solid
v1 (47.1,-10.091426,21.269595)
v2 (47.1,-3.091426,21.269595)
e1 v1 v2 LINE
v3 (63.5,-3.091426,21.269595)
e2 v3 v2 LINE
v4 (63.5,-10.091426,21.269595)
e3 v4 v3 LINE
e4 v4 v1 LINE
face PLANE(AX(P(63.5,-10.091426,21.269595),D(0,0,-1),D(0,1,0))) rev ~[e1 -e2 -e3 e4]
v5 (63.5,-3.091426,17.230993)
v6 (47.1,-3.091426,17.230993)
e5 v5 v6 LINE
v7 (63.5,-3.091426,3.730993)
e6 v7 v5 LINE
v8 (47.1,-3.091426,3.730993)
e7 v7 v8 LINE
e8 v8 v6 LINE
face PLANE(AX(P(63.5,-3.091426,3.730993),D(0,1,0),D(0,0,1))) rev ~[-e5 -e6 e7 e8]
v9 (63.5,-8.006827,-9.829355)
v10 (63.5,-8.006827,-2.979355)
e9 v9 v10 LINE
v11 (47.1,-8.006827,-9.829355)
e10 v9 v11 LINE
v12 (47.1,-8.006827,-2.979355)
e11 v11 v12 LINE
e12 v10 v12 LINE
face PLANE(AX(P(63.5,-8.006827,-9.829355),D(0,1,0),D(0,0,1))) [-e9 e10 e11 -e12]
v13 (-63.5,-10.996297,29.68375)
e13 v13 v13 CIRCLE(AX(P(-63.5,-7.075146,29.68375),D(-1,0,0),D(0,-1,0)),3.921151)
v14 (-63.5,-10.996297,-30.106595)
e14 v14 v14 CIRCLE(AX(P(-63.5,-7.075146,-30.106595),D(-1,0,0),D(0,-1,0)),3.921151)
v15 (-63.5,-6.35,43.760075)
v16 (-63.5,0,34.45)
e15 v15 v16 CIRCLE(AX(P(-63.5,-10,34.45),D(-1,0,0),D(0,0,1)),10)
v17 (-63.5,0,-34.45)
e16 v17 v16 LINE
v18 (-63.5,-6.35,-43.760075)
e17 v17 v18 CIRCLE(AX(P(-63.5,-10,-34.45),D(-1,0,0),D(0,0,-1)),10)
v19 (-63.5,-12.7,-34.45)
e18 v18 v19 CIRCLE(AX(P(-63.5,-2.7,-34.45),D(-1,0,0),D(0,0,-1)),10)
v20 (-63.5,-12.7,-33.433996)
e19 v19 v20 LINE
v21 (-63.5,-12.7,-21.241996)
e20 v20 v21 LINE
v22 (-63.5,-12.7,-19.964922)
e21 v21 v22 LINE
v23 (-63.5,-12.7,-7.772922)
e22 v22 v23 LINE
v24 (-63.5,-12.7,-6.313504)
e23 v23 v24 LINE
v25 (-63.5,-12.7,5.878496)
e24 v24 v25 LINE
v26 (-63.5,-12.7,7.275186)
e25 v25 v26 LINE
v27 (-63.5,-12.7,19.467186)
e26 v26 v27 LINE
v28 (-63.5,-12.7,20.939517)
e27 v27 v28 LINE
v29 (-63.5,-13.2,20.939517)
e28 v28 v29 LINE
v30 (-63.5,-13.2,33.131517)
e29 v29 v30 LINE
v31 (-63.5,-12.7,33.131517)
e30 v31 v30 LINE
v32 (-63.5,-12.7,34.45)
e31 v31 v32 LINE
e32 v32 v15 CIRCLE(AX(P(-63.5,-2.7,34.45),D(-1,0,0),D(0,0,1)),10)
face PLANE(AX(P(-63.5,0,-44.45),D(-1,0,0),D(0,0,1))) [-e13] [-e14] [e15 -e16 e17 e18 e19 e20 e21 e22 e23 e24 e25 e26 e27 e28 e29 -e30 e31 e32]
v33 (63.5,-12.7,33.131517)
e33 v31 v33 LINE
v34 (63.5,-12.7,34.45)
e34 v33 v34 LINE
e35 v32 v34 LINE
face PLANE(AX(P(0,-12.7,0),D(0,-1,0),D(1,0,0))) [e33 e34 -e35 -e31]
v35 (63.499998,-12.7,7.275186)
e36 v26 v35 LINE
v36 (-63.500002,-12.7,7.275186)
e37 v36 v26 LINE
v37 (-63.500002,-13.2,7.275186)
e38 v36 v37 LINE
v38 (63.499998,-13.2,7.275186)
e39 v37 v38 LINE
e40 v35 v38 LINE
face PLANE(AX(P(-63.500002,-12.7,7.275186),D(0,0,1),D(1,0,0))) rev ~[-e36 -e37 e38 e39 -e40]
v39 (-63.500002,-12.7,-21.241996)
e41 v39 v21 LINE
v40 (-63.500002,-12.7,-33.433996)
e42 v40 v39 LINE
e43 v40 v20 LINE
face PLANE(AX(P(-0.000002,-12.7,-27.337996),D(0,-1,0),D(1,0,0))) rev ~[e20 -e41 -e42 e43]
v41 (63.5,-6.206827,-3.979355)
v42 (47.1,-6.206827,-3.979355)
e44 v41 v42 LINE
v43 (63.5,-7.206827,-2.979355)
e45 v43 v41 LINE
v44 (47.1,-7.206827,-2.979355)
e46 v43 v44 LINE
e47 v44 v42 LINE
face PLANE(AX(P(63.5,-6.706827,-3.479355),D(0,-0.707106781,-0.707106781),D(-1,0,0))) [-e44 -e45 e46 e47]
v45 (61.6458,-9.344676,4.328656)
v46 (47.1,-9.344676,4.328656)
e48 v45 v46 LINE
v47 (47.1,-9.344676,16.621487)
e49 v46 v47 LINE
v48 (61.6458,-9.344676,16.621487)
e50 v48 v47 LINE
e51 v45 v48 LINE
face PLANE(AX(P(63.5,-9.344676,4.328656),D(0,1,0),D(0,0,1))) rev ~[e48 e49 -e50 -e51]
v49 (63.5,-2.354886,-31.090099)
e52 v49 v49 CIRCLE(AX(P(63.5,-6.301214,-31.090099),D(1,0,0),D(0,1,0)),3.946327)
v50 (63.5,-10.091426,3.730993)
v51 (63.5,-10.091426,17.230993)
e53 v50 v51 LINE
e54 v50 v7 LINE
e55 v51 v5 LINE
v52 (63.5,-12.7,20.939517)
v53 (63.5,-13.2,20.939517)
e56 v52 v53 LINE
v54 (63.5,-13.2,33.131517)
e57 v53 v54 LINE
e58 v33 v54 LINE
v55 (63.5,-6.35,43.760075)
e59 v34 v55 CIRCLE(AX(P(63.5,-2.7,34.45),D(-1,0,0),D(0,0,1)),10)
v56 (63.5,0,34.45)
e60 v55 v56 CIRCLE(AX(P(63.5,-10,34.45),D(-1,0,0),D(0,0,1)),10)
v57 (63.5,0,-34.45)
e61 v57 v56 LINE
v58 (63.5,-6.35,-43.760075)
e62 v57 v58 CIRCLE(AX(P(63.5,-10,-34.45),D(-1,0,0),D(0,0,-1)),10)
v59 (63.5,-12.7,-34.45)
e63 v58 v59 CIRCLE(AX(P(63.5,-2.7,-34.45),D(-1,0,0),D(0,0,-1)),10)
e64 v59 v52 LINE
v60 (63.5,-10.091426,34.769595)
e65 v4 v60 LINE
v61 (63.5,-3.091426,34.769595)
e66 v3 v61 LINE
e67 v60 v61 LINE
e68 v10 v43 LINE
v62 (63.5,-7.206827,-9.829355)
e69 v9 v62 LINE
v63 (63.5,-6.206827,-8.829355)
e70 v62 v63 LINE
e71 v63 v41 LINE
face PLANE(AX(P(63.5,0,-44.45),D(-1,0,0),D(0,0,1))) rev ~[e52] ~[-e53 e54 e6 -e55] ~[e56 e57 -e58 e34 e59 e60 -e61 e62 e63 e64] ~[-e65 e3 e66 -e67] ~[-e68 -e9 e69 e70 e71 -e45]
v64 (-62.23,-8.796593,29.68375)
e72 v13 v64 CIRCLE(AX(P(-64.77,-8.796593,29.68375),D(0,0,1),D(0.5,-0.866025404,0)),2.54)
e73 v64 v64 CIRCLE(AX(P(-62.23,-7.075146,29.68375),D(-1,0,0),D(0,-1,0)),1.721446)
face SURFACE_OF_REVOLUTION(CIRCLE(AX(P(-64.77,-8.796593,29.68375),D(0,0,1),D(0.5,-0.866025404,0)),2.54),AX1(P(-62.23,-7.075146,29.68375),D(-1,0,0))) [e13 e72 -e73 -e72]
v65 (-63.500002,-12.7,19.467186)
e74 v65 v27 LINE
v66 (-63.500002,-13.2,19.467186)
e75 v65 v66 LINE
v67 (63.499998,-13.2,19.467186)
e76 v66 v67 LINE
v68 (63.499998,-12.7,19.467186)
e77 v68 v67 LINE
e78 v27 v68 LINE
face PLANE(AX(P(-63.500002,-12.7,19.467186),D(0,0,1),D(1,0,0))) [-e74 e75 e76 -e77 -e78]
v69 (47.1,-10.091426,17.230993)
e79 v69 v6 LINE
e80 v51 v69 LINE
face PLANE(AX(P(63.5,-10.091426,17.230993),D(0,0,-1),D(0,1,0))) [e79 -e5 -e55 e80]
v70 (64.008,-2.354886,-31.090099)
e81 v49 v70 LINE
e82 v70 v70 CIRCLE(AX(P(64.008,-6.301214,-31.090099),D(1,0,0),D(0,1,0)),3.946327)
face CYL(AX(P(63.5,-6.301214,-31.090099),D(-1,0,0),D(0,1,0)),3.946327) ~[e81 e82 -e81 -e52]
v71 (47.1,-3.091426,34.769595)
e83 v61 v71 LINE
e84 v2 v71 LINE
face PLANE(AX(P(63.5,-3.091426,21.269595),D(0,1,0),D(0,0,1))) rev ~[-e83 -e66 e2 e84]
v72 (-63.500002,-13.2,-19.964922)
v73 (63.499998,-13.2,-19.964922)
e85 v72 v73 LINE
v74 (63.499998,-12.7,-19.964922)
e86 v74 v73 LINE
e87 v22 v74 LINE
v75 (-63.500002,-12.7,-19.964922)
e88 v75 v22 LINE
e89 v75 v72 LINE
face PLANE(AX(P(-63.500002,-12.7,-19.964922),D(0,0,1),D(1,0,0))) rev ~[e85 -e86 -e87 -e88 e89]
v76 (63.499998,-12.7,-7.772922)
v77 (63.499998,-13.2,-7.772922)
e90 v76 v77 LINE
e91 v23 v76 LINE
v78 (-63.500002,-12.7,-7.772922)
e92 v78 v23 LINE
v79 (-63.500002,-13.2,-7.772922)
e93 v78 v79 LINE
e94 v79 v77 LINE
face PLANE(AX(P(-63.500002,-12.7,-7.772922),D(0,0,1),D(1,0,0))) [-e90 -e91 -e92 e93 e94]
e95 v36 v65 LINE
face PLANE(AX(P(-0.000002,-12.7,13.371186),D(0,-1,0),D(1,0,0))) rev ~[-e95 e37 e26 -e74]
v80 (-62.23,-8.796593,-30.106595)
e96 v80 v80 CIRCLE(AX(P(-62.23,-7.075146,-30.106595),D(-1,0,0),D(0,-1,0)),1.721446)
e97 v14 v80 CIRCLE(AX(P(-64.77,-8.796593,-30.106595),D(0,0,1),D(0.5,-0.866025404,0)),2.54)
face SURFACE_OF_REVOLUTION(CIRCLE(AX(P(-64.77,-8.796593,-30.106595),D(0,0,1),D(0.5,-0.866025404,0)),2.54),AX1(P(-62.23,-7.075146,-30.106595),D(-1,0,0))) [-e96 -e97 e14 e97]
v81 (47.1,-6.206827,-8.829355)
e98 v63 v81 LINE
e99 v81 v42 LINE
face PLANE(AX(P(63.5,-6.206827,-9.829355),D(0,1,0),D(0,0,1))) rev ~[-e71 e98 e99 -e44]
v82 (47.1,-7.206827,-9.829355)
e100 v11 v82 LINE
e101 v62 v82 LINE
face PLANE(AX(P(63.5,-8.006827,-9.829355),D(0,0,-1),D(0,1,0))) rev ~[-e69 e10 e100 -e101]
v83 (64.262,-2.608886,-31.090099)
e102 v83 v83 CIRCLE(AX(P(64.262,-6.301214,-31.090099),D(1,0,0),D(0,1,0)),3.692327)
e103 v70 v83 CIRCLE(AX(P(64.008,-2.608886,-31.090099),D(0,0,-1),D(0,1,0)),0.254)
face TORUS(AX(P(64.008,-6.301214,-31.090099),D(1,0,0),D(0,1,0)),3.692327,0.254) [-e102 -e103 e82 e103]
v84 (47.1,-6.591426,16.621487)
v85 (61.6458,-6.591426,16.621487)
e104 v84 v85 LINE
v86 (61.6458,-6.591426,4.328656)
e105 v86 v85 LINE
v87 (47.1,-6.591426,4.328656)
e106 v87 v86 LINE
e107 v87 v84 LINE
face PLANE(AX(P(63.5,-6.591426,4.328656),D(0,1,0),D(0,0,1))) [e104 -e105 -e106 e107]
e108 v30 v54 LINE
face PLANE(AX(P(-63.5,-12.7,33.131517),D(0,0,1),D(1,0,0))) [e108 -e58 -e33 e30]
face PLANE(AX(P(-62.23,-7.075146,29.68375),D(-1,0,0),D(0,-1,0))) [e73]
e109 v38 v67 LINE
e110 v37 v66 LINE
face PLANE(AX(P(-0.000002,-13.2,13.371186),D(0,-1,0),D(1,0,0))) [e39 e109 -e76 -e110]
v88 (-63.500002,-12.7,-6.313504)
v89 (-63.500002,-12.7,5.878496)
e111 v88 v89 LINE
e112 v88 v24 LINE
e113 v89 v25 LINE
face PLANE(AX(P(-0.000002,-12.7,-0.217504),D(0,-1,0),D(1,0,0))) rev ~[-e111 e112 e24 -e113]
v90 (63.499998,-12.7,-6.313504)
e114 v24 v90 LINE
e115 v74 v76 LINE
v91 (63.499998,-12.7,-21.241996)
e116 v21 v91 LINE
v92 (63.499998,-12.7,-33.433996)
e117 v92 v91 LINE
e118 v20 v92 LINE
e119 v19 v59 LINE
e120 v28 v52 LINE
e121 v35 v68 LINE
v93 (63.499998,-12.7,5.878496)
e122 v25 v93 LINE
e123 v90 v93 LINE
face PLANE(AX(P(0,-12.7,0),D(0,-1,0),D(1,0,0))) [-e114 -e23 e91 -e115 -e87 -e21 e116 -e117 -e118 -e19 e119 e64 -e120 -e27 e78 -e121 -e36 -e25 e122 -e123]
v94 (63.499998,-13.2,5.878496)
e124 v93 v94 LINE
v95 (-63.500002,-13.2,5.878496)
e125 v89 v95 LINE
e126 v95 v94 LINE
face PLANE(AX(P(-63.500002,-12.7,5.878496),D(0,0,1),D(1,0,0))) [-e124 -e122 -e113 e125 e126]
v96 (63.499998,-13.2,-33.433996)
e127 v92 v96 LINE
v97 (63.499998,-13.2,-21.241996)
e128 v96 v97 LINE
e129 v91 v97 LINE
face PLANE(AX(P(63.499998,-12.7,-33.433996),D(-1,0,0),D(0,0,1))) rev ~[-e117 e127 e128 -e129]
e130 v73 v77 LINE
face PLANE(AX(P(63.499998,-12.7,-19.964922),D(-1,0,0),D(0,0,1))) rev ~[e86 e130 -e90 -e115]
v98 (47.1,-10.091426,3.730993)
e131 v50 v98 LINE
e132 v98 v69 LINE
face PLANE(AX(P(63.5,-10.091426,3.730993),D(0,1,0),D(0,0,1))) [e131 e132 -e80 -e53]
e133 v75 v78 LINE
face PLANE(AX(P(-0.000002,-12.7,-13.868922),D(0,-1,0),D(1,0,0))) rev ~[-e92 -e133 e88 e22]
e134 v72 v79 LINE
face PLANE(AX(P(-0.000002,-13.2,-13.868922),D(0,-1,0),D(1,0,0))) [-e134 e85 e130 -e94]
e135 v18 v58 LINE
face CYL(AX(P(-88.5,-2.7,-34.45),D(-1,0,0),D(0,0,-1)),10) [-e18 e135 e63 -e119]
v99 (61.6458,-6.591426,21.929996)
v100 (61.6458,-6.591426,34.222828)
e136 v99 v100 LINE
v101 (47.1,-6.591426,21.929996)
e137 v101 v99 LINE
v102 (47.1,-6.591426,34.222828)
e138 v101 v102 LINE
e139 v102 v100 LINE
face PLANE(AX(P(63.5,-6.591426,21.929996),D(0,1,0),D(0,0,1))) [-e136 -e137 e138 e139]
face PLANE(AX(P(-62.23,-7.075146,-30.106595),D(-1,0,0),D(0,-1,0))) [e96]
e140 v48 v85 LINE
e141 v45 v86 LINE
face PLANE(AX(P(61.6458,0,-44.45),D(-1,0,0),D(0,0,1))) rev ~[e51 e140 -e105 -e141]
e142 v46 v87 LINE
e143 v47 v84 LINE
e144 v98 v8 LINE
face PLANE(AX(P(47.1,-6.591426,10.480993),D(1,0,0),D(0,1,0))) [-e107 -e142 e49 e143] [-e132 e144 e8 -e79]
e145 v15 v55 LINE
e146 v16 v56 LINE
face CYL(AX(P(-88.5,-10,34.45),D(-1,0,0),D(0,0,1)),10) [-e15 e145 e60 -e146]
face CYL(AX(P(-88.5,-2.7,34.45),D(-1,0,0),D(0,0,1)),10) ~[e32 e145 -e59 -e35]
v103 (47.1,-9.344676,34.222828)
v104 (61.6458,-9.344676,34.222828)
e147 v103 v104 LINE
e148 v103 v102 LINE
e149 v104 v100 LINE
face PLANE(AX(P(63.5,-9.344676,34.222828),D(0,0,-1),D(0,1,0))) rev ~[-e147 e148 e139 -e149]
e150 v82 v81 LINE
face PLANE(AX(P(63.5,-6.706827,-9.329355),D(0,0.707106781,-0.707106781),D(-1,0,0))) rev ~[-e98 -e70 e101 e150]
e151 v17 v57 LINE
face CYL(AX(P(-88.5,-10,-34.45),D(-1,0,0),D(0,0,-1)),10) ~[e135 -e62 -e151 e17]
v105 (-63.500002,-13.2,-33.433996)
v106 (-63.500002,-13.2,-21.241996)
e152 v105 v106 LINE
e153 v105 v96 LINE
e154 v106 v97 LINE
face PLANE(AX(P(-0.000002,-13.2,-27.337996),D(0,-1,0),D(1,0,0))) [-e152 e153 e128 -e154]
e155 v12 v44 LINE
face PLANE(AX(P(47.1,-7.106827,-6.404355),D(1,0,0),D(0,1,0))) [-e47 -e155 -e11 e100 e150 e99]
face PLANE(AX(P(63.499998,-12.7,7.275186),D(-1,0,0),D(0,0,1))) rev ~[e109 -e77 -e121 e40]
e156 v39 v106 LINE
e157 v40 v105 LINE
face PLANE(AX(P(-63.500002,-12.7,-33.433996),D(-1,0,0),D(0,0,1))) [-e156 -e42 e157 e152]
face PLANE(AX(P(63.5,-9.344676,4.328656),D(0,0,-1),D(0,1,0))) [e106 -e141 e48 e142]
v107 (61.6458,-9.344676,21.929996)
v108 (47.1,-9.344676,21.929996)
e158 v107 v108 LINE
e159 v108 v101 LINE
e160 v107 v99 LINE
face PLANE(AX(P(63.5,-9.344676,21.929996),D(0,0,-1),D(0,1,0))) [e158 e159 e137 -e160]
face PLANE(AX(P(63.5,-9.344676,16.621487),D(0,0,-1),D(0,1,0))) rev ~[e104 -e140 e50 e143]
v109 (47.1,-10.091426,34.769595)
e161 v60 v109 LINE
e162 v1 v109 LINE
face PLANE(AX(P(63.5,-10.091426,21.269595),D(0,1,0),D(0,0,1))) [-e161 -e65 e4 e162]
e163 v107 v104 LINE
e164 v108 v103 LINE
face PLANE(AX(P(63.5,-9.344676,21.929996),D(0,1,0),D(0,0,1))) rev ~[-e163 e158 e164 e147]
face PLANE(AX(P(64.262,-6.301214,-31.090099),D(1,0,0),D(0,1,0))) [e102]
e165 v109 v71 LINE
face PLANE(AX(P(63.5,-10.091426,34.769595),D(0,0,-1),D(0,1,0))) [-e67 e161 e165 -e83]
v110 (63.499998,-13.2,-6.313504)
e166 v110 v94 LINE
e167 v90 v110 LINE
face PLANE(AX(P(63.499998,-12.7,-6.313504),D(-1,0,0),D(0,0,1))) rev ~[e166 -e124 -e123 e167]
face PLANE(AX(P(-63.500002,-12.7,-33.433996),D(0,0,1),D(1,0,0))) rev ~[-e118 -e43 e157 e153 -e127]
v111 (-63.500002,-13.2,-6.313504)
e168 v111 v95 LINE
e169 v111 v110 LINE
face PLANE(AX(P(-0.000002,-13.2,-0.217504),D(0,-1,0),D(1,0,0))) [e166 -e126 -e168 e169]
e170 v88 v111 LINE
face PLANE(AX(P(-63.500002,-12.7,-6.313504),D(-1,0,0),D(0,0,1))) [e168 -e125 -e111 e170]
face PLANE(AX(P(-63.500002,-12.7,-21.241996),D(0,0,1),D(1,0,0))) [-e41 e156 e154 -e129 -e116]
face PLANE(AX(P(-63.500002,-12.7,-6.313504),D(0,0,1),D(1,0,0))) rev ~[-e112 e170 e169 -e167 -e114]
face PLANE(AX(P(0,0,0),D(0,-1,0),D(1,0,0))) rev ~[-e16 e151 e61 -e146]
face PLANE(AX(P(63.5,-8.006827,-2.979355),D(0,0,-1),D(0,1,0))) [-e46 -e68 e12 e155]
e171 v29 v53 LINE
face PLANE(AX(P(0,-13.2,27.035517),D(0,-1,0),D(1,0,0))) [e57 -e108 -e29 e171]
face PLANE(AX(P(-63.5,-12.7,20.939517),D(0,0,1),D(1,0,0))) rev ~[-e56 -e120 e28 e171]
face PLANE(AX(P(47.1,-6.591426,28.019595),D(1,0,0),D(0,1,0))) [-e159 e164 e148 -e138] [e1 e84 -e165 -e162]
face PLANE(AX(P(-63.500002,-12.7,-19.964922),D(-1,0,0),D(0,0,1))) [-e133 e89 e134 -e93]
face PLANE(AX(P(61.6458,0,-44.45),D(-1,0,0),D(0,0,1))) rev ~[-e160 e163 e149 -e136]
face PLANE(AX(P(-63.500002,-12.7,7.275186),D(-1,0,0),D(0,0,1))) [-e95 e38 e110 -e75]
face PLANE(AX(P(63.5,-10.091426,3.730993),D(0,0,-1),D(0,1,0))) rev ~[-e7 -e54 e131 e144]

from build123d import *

# Parameters (mm, degrees)
F0_W        = 127
F0_H        = 88.9
F1_DEPTH    = 12.7
F2_T1_DEPTH = 177
F3_W        = 1.8
F3_H        = 6.85
F4_DEPTH    = 16.4
F3_W_2      = 7
F3_H_2      = 13.5
F3_W_3      = 2.7532497272
F3_H_3      = 12.2928316705
F5_DEPTH    = 16.4
F6_SIZE     = 1
F7_DEPTH    = 2.794
F8_DEPTH    = 1.8542
F3_R        = 3.9463270772
F9_DEPTH    = 0.762
F10_R       = 0.254
F13_W       = 127
F13_H       = 12.192
F14_DEPTH   = 0.5
F15_R       = 3.9211509086
F16_DEPTH   = 1.27


# Not quite as in the source:
# - a fillet or chamfer that OpenCascade refuses, or shapes differently, is made with other operations: its cross-section is extruded or revolved along the edge and cut away or added
# - the program builds the solid bodies; features that only make, move or delete a surface that nothing else refers to are left out


with BuildPart() as f1:
    # F0 (on Front) → F1 (new body)
    with BuildSketch(Plane.XZ):
        Rectangle(F0_W, F0_H)
    extrude(amount=F1_DEPTH)

    # F2: fillet of radius 10 on 4 edges, made by hand

    # F2_s2 → F2_t1 (cut)
    with BuildSketch(Plane.YZ.offset(-88.5)):
        with BuildLine():
            ThreePointArc((-2.7, 44.45), (-9.7710678119, 41.5210678119), (-12.7, 34.45))
            Line((-12.7, 34.45), (-12.7, 44.45))
            Line((-12.7, 44.45), (-2.7, 44.45))
        make_face()
        with BuildLine():
            ThreePointArc((-10, 44.45), (-2.9289321881, 41.5210678119), (0, 34.45))
            Line((0, 34.45), (0, 44.45))
            Line((0, 44.45), (-10, 44.45))
        make_face()
        with BuildLine():
            ThreePointArc((-2.7, -44.45), (-9.7710678119, -41.5210678119), (-12.7, -34.45))
            Line((-12.7, -34.45), (-12.7, -44.45))
            Line((-12.7, -44.45), (-2.7, -44.45))
        make_face()
        with BuildLine():
            ThreePointArc((-10, -44.45), (-2.9289321881, -41.5210678119), (0, -34.45))
            Line((0, -34.45), (0, -44.45))
            Line((0, -44.45), (-10, -44.45))
        make_face()
    extrude(amount=F2_T1_DEPTH, mode=Mode.SUBTRACT)

    # F3 (on face) → F4 (cut)
    with BuildSketch(Plane.YZ.offset(63.5)):
        with Locations((-7.1068273082, -6.4043554038)):
            Rectangle(F3_W, F3_H)
    extrude(amount=-F4_DEPTH, mode=Mode.SUBTRACT)

    # F3 (on face) → F5 (cut)
    with BuildSketch(Plane.YZ.offset(63.5)):
        with Locations((-6.591425851, 10.4809925538)):
            Rectangle(F3_W_2, F3_H_2)
        with Locations((-7.9680507146, 10.4750713799)):
            Rectangle(F3_W_3, F3_H_3, mode=Mode.SUBTRACT)
        with Locations((-6.591425851, 28.0195952505)):
            Rectangle(F3_W_2, F3_H_2)
        with Locations((-7.9680507146, 28.0764119234)):
            Rectangle(F3_W_3, F3_H_3, mode=Mode.SUBTRACT)
    extrude(amount=-F5_DEPTH, mode=Mode.SUBTRACT)

    # F6
    f6_edges = [f1.edges().sort_by_distance(p)[0] for p in [
        (55.3, -6.206827, -2.979355),
        (55.3, -6.206827, -9.829355),
    ]]
    chamfer(f6_edges, length=F6_SIZE)

    # F7 (add): faces of the model
    f7_faces = [f1.faces().sort_by_distance(p)[0] for p in [
        (63.5, -7.9680507146, 10.4750713799),
        (63.5, -7.9680507146, 28.0764119234),
    ]]
    extrude(f7_faces, amount=-F7_DEPTH)

    # F8 (cut): faces of the model
    f8_faces = [f1.faces().sort_by_distance(p)[0] for p in [
        (63.5, -7.9680507146, 10.4750713799),
        (63.5, -7.9680507146, 28.0764119234),
    ]]
    extrude(f8_faces, amount=-F8_DEPTH, mode=Mode.SUBTRACT)

    # F3 (on face) → F9 (join)
    with BuildSketch(Plane.YZ.offset(63.5)):
        with Locations((-6.3012135215, -31.0900993645)):
            Circle(F3_R)
    extrude(amount=F9_DEPTH)

    # F10
    f10_edges = [f1.edges().sort_by_distance(p)[0] for p in [
        (64.262, -10.247541, -31.090099),
    ]]
    fillet(f10_edges, radius=F10_R)

    # F13 (on face) → F14 (join)
    with BuildSketch(Plane.XZ.offset(12.7)):
        with Locations((0, 27.0355174699)):
            Rectangle(F13_W, F13_H)
        with Locations((-2.0266e-06, 13.3711864791)):
            Rectangle(F13_W, F13_H)
        with Locations((-2.0266e-06, -0.2175037199)):
            Rectangle(F13_W, F13_H)
        with Locations((-2.0266e-06, -13.8689222195)):
            Rectangle(F13_W, F13_H)
        with Locations((-2.0266e-06, -27.337996141)):
            Rectangle(F13_W, F13_H)
    extrude(amount=F14_DEPTH)

    # F15 (on face) → F16 (cut)
    with BuildSketch(Plane(origin=(-63.5, 0, 0), x_dir=(0, -1, 0), z_dir=(-1, 0, 0))):
        with Locations((7.0751463063, -30.106594786)):
            Circle(F15_R)
        with Locations((7.0751463063, 29.6837498702)):
            Circle(F15_R)
    extrude(amount=-F16_DEPTH, mode=Mode.SUBTRACT)

    # F17: fillet of radius 2.54 on 2 edges, made by hand

    # F17_s1 → F17_t2 (revolve)
    with BuildSketch(Plane.XY.offset(-30.106594786)):
        with BuildLine():
            ThreePointArc((-63.5, -10.9962972149), (-62.5702954744, -10.0665926893), (-62.23, -8.7965926893))
            Line((-62.23, -8.7965926893), (-62.23, -10.9962972149))
            Line((-62.23, -10.9962972149), (-63.5, -10.9962972149))
        make_face()
    revolve(axis=Axis((-62.23, -7.0751463063, -30.106594786), (-1, 0, 0)))

    # F17_s3 → F17_t4 (revolve)
    with BuildSketch(Plane.XY.offset(29.6837498702)):
        with BuildLine():
            ThreePointArc((-63.5, -10.9962972149), (-62.5702954744, -10.0665926893), (-62.23, -8.7965926893))
            Line((-62.23, -8.7965926893), (-62.23, -10.9962972149))
            Line((-62.23, -10.9962972149), (-63.5, -10.9962972149))
        make_face()
    revolve(axis=Axis((-62.23, -7.0751463063, 29.6837498702), (-1, 0, 0)))


solid = f1.part
